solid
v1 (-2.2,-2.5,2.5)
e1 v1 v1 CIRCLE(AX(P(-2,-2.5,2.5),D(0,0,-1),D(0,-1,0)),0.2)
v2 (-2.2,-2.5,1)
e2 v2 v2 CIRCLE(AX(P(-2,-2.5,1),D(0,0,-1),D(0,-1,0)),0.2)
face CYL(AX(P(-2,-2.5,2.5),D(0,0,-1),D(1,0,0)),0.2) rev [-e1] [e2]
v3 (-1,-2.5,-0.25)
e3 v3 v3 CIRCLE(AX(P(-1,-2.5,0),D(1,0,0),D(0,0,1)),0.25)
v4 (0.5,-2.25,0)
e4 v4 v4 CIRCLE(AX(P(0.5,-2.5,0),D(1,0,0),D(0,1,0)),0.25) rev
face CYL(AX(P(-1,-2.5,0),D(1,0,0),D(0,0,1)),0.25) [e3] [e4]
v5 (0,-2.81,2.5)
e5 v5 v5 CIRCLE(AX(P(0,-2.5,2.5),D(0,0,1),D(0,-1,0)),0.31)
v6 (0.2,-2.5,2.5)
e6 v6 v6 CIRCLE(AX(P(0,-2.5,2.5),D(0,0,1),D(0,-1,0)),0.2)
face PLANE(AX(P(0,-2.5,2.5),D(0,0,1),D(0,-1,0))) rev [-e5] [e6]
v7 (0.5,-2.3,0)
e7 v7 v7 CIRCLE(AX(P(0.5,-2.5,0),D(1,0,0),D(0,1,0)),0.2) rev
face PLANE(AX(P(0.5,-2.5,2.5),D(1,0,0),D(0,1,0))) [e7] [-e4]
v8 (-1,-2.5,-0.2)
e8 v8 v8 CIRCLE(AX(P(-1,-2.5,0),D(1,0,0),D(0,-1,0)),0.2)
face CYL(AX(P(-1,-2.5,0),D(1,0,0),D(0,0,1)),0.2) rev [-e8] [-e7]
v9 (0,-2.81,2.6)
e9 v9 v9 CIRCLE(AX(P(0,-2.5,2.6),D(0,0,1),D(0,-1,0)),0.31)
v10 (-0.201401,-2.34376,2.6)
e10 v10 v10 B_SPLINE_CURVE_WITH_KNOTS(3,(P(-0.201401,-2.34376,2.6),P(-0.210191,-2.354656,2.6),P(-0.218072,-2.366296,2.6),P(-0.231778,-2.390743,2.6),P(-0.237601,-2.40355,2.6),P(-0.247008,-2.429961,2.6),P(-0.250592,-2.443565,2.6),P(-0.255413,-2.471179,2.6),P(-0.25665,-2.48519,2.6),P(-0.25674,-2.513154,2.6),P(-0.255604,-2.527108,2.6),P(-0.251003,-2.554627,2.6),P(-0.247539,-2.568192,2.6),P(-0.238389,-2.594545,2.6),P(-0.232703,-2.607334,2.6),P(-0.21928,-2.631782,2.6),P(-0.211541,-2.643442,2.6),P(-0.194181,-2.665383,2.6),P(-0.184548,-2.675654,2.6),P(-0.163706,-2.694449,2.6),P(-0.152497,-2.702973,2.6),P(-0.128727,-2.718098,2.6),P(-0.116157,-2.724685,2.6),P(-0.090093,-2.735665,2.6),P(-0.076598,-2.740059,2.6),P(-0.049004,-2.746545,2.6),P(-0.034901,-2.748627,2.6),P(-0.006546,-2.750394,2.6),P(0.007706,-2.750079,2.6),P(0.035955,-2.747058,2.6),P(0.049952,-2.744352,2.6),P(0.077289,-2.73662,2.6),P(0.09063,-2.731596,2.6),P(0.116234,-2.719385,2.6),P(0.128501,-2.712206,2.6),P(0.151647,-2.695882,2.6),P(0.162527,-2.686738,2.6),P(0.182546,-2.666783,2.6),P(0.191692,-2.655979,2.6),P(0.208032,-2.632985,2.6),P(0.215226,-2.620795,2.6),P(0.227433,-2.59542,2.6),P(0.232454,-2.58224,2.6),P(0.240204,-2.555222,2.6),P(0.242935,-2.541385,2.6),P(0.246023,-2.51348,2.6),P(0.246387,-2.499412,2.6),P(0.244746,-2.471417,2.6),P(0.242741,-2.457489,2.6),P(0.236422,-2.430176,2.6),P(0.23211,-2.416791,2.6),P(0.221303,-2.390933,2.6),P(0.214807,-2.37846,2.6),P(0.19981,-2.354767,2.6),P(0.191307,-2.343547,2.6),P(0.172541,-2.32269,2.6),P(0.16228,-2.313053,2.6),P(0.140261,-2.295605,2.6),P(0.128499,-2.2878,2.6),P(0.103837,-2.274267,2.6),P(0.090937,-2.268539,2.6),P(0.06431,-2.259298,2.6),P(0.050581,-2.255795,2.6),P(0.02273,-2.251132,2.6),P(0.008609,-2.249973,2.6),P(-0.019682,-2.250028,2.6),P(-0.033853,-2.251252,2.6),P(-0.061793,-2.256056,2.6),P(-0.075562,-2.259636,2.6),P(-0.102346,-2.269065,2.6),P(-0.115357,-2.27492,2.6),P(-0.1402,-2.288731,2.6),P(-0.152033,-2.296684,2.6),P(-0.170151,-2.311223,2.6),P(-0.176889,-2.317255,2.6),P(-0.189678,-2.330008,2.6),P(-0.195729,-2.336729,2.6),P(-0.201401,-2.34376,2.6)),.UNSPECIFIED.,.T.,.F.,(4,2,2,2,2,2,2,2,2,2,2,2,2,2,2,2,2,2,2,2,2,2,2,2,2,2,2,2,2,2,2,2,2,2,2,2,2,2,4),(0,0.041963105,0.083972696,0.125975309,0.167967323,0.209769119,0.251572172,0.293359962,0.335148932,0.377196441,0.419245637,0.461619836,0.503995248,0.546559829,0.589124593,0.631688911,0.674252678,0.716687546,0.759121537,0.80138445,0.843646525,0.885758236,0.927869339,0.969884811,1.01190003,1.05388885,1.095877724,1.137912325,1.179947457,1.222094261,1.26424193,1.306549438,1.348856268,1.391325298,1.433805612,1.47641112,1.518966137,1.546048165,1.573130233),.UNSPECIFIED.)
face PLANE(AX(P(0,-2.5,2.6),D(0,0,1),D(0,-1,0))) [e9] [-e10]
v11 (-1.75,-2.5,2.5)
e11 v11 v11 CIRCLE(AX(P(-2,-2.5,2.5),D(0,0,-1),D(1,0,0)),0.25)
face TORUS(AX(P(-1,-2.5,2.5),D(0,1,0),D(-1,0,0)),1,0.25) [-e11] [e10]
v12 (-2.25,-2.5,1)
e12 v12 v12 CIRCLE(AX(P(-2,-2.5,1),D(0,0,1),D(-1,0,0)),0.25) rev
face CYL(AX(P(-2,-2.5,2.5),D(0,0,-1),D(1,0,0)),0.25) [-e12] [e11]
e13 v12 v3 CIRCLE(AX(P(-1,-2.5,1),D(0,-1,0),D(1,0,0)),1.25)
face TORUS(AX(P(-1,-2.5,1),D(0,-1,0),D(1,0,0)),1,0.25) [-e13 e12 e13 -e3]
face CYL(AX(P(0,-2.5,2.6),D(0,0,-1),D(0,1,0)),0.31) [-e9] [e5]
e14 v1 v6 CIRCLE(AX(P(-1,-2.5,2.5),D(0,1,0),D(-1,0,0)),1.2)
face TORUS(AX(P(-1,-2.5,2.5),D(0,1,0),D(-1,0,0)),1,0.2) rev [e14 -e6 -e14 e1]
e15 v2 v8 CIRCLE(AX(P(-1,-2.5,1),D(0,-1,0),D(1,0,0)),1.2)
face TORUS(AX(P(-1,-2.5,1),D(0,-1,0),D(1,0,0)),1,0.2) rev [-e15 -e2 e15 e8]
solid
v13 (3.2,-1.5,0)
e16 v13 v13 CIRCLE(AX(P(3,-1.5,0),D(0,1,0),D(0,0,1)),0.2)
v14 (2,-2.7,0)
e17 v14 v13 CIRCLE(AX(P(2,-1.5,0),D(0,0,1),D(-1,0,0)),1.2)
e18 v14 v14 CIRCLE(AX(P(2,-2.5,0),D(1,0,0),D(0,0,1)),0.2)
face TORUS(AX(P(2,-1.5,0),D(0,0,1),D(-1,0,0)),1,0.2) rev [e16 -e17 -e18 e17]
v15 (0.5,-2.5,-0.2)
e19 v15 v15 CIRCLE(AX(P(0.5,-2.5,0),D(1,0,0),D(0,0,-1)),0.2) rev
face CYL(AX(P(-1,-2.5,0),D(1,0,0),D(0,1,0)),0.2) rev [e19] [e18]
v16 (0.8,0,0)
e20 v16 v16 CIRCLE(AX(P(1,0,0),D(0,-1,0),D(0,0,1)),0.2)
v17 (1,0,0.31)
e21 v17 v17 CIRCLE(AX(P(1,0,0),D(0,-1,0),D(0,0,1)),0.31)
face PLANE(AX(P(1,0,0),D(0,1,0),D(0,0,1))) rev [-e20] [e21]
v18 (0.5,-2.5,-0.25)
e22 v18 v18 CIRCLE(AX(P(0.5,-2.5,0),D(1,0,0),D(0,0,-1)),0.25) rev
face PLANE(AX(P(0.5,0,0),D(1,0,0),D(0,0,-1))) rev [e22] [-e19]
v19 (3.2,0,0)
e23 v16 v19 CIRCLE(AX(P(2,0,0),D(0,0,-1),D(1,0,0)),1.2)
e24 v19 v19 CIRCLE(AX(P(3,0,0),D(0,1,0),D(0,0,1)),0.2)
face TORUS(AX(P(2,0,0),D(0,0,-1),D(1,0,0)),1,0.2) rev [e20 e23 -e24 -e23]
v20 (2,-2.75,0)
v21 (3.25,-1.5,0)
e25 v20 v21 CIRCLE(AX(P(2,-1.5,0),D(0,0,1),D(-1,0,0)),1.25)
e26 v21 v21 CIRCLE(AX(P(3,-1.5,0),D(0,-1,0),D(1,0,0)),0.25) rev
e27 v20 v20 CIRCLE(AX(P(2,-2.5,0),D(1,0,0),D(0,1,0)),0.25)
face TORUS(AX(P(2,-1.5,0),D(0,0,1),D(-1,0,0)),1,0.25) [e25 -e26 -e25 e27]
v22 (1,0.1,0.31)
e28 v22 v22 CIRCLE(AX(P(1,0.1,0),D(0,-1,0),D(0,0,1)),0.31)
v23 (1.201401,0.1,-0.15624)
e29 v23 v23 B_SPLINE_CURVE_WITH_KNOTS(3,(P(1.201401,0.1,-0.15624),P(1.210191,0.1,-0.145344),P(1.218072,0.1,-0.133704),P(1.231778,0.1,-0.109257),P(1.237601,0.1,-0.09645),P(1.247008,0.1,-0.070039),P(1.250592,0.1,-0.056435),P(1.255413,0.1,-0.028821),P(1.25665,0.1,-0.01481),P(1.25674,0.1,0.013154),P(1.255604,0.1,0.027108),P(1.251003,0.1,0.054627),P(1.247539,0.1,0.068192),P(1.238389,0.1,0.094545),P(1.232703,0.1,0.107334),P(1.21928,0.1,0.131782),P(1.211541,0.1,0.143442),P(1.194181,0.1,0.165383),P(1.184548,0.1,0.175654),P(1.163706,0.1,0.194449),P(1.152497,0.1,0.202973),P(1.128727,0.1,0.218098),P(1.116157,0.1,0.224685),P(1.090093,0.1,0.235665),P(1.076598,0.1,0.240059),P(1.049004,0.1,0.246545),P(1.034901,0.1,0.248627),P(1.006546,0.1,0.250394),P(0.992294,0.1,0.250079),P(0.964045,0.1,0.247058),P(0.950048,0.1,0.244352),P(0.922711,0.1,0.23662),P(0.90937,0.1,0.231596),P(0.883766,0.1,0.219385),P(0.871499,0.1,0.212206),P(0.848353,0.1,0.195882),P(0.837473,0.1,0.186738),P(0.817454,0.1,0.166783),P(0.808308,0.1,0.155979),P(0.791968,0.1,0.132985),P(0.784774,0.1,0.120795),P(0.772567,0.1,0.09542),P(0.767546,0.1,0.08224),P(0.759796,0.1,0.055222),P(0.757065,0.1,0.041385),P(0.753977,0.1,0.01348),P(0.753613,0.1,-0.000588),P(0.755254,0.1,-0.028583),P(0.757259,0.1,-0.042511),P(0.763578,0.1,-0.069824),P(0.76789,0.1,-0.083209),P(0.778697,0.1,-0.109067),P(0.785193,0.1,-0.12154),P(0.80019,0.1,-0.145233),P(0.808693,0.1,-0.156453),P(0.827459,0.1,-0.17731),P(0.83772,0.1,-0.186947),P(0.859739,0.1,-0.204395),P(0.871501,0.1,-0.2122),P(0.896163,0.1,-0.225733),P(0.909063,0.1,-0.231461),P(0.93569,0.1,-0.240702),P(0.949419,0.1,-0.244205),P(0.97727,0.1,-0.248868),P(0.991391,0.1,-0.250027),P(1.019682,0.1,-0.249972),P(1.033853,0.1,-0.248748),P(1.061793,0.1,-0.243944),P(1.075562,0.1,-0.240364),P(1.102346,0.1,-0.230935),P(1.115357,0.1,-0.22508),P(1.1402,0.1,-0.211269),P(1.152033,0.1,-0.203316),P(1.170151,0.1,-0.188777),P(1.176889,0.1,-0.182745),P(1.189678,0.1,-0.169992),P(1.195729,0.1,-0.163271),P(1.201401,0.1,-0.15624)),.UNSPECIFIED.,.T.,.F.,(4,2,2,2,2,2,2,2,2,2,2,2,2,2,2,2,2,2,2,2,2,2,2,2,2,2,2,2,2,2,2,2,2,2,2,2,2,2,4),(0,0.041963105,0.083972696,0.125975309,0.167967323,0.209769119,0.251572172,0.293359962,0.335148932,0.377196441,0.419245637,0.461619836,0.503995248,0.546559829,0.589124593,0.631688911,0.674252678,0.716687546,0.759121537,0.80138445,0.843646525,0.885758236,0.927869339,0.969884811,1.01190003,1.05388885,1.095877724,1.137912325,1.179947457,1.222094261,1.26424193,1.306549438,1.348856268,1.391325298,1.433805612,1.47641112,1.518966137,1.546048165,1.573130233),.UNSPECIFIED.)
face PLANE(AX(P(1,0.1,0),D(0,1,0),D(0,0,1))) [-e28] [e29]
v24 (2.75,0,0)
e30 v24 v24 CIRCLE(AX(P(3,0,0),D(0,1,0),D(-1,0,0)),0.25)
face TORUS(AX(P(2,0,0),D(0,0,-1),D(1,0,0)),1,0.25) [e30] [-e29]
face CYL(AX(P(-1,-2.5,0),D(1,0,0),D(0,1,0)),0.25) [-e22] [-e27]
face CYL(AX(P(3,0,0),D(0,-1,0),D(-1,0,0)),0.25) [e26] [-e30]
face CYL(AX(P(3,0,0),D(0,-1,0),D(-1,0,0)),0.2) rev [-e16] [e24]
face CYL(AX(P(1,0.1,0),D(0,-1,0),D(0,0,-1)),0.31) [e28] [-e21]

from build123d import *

# Parameters (mm, degrees)
SKETCH3_R             = 0.25
SKETCH3_R_2           = 0.2
SKETCH6_R             = 0.31
SKETCH6_R_2           = 0.21
BODY_MOVE_COPY1_ANGLE = 90


# Read off the part's stored shape, not the designer's step: Split1
with BuildPart() as part:
    # Sweep-Thin1: sweep along a path in Sketch1
    with BuildLine(Plane.XY) as sweep_thin1_path:
        Line((0.5, -2.5), (-1, -2.5))
        ThreePointArc((-1, -2.5), (-1.707106781, -2.207106781), (-2, -1.5))
        Line((-2, -1.5), (-2, 0))
        ThreePointArc((-2, 0), (-1, 1), (0, 0))
    # Sketch3 → Sweep-Thin1 (sweep)
    with BuildSketch(Plane(origin=(0, 0, 0), x_dir=(1, 0, 0), z_dir=(0, 1, 0))):
        Circle(SKETCH3_R)
        Circle(SKETCH3_R_2, mode=Mode.SUBTRACT)
    sweep(path=sweep_thin1_path.line)

    # Sweep-Thin2: sweep along a path in Sketch5
    with BuildLine(Plane.XY) as sweep_thin2_path:
        Line((0, 0), (0, 0.1))
    # Sketch6 → Sweep-Thin2 (sweep)
    with BuildSketch(Plane(origin=(0, 0, 0), x_dir=(1, 0, 0), z_dir=(0, 1, 0))):
        Circle(SKETCH6_R)
        Circle(SKETCH6_R_2, mode=Mode.SUBTRACT)
    sweep(path=sweep_thin2_path.line)

    # Mirror2: part across plane


with BuildPart() as part_1:
    add(part.part)
    add(part.part.mirror(Plane(origin=(0.5, -2.5, 0), x_dir=(0, 0, 1), z_dir=(1, 0, 0))))


with BuildPart() as body_2:
    # Split1: the piece on the far side of the plane
    add(part_1.part)
    split(bisect_by=Plane.YZ.offset(0.5), keep=Keep.BOTTOM)


with BuildPart() as part_2:
    add(part_1.part)

    # Split1
    split(bisect_by=Plane.YZ.offset(0.5), keep=Keep.TOP)


with BuildPart() as body_2_1:
    # Body-Move/Copy1: moved
    add(body_2.part.rotate(Axis((0, -2.5, 0), (1, 0, 0)), BODY_MOVE_COPY1_ANGLE))


solid = Compound([part_2.part, body_2_1.part])
